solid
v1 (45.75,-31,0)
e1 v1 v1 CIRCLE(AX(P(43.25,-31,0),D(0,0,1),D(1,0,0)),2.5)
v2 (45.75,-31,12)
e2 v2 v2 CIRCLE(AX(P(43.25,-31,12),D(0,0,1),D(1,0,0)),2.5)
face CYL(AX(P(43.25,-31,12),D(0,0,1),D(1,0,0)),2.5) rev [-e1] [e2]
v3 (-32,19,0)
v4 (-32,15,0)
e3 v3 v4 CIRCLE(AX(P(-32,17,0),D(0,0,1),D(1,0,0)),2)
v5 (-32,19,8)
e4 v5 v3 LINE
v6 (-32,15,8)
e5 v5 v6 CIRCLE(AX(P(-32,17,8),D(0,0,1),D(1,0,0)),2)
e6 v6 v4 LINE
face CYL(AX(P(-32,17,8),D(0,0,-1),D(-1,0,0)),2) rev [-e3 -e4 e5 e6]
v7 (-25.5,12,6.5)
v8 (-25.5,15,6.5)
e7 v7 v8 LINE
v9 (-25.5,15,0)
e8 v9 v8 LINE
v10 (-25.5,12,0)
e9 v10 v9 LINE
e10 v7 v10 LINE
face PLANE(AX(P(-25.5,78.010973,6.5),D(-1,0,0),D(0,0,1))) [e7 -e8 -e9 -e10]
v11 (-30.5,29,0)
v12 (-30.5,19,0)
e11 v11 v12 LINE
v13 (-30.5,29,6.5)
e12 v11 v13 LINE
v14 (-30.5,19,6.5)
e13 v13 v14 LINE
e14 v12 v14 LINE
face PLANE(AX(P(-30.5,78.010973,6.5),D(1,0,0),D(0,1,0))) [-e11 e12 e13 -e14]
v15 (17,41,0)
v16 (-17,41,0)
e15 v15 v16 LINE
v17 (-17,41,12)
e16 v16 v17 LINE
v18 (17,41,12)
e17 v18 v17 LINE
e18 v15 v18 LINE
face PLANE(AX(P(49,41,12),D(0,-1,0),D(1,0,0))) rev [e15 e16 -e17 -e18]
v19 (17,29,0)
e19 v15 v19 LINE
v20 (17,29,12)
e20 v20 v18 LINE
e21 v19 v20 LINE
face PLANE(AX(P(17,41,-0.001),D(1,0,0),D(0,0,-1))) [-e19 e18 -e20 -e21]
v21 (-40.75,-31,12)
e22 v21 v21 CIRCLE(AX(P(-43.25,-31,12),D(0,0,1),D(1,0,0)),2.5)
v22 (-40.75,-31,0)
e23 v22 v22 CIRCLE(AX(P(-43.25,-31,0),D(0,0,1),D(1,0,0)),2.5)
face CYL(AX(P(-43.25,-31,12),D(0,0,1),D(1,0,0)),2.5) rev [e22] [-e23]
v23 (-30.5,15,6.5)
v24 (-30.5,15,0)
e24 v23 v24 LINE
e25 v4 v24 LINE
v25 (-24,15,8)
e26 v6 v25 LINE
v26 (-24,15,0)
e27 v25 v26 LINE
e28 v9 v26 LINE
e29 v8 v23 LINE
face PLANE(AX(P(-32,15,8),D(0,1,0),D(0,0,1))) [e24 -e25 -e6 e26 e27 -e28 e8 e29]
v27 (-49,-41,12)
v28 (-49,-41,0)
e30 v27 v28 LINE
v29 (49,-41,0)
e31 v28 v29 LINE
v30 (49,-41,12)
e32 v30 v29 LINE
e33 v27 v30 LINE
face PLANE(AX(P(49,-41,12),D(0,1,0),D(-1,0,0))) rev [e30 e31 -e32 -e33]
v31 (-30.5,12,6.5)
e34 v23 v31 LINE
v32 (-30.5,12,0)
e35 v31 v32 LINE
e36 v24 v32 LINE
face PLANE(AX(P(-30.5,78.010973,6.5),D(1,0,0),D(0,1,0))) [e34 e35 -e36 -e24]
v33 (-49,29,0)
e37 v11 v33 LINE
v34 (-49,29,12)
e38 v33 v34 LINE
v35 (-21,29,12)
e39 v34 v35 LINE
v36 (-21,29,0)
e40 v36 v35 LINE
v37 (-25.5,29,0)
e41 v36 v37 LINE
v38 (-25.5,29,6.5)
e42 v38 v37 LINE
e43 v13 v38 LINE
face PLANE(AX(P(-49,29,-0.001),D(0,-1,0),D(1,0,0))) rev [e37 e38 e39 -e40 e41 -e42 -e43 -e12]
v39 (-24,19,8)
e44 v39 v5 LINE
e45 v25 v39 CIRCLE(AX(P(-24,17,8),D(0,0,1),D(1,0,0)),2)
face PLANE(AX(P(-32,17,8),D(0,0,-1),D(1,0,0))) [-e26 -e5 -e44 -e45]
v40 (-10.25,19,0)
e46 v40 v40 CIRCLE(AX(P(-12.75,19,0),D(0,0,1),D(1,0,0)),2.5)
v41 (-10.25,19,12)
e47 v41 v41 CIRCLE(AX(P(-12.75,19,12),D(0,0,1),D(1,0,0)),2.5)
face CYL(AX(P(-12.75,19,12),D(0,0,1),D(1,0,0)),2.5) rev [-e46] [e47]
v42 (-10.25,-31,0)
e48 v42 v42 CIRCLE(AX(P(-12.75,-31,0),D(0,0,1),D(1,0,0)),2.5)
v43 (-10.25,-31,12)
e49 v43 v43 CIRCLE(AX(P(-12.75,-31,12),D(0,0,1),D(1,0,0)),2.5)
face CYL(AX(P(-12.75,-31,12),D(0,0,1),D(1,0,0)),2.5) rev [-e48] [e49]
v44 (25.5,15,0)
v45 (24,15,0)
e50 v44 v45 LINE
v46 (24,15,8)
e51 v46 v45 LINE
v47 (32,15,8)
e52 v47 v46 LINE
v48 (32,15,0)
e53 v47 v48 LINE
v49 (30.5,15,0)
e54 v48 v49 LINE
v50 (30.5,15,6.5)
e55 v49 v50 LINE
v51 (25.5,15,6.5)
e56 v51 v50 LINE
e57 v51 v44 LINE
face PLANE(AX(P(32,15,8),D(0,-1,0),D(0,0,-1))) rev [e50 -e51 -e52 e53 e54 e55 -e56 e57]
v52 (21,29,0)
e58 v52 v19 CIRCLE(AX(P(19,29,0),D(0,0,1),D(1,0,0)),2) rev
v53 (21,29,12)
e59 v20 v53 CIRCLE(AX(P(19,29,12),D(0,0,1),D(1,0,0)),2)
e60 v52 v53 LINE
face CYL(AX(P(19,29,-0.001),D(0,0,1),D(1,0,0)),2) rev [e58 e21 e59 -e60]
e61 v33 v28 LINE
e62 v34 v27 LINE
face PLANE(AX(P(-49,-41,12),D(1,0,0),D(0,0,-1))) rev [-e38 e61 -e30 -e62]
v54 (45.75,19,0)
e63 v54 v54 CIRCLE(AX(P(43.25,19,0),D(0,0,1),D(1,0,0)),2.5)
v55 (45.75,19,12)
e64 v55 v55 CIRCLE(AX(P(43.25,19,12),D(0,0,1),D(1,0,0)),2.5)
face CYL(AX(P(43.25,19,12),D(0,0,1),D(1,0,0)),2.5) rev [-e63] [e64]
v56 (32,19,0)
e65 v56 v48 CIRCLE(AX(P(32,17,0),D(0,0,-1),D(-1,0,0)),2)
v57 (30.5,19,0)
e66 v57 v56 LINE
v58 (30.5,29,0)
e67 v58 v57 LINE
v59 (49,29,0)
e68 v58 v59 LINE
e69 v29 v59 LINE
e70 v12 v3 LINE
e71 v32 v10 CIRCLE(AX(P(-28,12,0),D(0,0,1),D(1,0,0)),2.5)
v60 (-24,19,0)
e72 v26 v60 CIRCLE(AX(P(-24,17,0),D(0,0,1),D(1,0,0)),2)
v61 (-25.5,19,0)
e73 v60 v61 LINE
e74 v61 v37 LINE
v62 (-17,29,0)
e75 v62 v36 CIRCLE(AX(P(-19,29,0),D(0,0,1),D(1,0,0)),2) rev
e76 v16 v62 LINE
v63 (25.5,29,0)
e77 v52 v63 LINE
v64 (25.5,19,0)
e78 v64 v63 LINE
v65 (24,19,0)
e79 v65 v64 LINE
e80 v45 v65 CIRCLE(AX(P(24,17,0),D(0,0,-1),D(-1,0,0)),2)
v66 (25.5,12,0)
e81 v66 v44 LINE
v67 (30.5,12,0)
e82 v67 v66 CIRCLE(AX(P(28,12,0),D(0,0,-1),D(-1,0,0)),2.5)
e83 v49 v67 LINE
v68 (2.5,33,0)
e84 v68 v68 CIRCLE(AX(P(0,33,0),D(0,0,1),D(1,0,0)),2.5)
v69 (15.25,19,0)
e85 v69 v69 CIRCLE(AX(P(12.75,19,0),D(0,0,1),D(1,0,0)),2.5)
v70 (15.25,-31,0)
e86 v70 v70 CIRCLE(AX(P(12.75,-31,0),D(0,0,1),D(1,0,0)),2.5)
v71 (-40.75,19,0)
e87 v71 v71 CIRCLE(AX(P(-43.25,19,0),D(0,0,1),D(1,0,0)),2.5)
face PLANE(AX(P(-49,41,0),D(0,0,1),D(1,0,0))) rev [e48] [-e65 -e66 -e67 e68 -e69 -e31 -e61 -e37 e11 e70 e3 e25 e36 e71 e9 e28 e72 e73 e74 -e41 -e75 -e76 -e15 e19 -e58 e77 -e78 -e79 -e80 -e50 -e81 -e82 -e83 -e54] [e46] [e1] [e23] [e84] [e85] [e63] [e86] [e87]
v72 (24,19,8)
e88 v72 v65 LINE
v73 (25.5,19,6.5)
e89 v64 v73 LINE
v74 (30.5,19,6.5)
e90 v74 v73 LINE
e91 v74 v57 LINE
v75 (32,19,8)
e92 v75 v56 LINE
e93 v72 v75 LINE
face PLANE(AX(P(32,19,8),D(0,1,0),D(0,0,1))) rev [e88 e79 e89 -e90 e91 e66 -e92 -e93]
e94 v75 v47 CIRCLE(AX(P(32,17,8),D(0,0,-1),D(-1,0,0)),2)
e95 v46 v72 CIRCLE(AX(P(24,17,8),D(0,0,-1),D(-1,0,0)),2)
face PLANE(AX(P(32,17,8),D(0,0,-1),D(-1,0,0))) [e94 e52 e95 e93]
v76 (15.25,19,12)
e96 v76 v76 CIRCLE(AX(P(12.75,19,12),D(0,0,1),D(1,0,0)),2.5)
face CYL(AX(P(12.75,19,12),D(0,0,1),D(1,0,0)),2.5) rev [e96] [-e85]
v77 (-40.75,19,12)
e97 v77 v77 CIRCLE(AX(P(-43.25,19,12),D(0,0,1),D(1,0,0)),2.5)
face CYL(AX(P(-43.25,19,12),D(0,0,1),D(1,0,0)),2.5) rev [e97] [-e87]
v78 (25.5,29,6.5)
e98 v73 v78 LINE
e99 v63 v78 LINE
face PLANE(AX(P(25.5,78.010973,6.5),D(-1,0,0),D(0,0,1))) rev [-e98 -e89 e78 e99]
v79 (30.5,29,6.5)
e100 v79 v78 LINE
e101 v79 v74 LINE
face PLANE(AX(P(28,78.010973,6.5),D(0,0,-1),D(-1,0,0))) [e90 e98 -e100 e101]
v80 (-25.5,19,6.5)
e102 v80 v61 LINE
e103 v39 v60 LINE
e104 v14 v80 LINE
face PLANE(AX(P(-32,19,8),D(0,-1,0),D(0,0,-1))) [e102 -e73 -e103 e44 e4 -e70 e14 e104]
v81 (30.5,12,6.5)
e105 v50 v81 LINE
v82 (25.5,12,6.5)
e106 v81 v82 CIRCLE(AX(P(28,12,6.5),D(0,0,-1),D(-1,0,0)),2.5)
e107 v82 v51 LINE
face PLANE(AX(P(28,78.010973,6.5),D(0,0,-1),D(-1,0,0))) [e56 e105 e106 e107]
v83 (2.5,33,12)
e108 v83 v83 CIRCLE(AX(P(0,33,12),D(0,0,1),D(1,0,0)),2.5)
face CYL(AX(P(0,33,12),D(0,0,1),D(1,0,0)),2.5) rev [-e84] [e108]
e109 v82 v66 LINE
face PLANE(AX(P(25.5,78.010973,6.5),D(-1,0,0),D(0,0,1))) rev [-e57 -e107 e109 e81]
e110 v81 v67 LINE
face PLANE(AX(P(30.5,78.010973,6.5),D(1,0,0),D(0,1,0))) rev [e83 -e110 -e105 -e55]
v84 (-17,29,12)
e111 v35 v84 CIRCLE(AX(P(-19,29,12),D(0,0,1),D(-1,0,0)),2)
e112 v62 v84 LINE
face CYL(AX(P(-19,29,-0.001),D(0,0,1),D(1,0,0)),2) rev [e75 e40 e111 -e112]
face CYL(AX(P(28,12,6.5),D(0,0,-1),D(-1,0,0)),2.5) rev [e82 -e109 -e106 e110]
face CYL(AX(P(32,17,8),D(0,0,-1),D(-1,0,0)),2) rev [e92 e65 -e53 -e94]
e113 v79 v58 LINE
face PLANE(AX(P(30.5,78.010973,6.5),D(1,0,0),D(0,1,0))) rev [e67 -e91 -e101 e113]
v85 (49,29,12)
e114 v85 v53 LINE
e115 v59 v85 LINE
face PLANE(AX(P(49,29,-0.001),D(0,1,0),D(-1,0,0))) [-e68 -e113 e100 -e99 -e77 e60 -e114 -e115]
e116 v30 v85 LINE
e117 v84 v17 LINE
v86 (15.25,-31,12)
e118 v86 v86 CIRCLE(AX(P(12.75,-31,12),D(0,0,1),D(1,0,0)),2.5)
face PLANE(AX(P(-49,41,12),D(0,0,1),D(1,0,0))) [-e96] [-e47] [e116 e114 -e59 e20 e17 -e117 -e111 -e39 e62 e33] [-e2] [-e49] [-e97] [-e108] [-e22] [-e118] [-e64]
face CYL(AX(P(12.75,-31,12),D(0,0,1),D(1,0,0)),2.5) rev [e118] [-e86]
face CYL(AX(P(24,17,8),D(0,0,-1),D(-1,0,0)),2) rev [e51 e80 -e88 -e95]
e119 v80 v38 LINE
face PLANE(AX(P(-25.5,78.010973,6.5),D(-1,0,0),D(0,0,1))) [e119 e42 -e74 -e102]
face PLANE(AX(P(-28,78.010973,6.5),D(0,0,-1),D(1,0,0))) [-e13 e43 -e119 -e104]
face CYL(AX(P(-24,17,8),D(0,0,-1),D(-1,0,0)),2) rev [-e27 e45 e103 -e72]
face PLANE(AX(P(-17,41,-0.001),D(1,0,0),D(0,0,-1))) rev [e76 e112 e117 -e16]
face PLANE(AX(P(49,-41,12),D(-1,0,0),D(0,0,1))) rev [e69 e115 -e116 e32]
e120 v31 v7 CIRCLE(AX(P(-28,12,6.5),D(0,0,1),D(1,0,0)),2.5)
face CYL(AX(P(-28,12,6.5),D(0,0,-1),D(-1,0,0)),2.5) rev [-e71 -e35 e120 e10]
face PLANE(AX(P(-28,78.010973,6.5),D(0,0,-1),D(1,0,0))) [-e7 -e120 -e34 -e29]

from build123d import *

# Parameters (mm, degrees)
SKETCH1_W                = 98
SKETCH1_H                = 82
BOSS_EXTRUDE1_DEPTH      = 12
CUT_EXTRUDE1_REACH       = 67.008
SKETCH4_W                = 32
SKETCH4_H                = 12
F_5_0_5_DIAMETER_HOLE2_D = 5
F_5_0_5_DIAMETER_HOLE3_D = 5
CUT_EXTRUDE3_DEPTH       = 8
CUT_EXTRUDE4_DEPTH       = 6.5
F_5_0_5_DIAMETER_HOLE1_D = 5
CUT_EXTRUDE2_REACH       = 67.008


# Read off the part's stored shape, not the designer's step: Cut-Extrude3
with BuildPart() as part:
    # Sketch1 → Boss-Extrude1 (new body)
    with BuildSketch(Plane.XY):
        Rectangle(SKETCH1_W, SKETCH1_H)
    extrude(amount=BOSS_EXTRUDE1_DEPTH)

    # Sketch4 → Cut-Extrude1 (cut, up to next)
    with BuildSketch(Plane.XY.offset(12), mode=Mode.PRIVATE) as cut_extrude1_sk1:
        with Locations((-33, 35)):
            Rectangle(SKETCH4_W, SKETCH4_H)
    cut_extrude1_tool1 = extrude(cut_extrude1_sk1.sketch, amount=-CUT_EXTRUDE1_REACH, mode=Mode.PRIVATE) & part.part
    cut_extrude1 = cut_extrude1_tool1.solids().sort_by_distance((-33, 35, 12))[0]
    add(cut_extrude1, mode=Mode.SUBTRACT)

    # Mirror2: Cut-Extrude1 across plane
    add(cut_extrude1.mirror(Plane(origin=(0, 0, 0), x_dir=(0, 0, 1), z_dir=(1, 0, 0))), mode=Mode.SUBTRACT)

    # Ø5.0 (5) Diameter Hole2 (through all)
    with Locations(Plane.XY.offset(12)):
        with Locations((-12.75, 19), (-12.75, -31)):
            f_5_0_5_diameter_hole2 = Hole(F_5_0_5_DIAMETER_HOLE2_D / 2)

    # Ø5.0 (5) Diameter Hole3 (through all)
    with Locations(Plane.XY.offset(12)):
        with Locations((-43.25, 19), (-43.25, -31)):
            f_5_0_5_diameter_hole3 = Hole(F_5_0_5_DIAMETER_HOLE3_D / 2)

    # Cut-Extrude3 outline → Cut-Extrude3 (cut)
    with BuildSketch(Plane.XY):
        with BuildLine():
            ThreePointArc((32, 15), (34, 17), (32, 19))
            Line((32, 19), (24, 19))
            ThreePointArc((24, 19), (22, 17), (24, 15))
            Line((24, 15), (32, 15))
        make_face()
    cut_extrude3 = extrude(amount=CUT_EXTRUDE3_DEPTH, mode=Mode.SUBTRACT)

    # Sketch20 → Cut-Extrude4 (cut)
    with BuildSketch(Plane(origin=(39.292468455, 97.580435701, 0), x_dir=(-1, 0, 0), z_dir=(0, 0, -1))):
        with BuildLine():
            Line((13.792468455, -19.569462754), (13.792468455, -85.580435701))
            ThreePointArc((13.792468455, -85.580435701), (11.292468455, -88.080435701), (8.792468455, -85.580435701))
            Line((8.792468455, -85.580435701), (8.792468455, -19.569462754))
            ThreePointArc((8.792468455, -19.569462754), (11.292468455, -17.069462754), (13.792468455, -19.569462754))
        make_face()
    cut_extrude4 = extrude(amount=-CUT_EXTRUDE4_DEPTH, mode=Mode.SUBTRACT)

    # Mirror1: Ø5.0 (5) Diameter Hole2, Ø5.0 (5) Diameter Hole3, Cut-Extrude3, Cut-Extrude4 across plane
    add(f_5_0_5_diameter_hole2.mirror(Plane(origin=(0, 0, 0), x_dir=(0, 0, 1), z_dir=(1, 0, 0))), mode=Mode.SUBTRACT)
    add(f_5_0_5_diameter_hole3.mirror(Plane(origin=(0, 0, 0), x_dir=(0, 0, 1), z_dir=(1, 0, 0))), mode=Mode.SUBTRACT)
    add(cut_extrude3.mirror(Plane(origin=(0, 0, 0), x_dir=(0, 0, 1), z_dir=(1, 0, 0))), mode=Mode.SUBTRACT)
    add(cut_extrude4.mirror(Plane(origin=(0, 0, 0), x_dir=(0, 0, 1), z_dir=(1, 0, 0))), mode=Mode.SUBTRACT)

    # Ø5.0 (5) Diameter Hole1 (through all)
    with Locations(Plane.XY.offset(12)):
        with Locations((0, 33)):
            Hole(F_5_0_5_DIAMETER_HOLE1_D / 2)

    # Sketch16 → Cut-Extrude2 (cut, up to next)
    with BuildSketch(Plane.XY.offset(12), mode=Mode.PRIVATE) as cut_extrude2_sk1:
        with BuildLine():
            Line((-21, 29), (-17, 29))
            ThreePointArc((-17, 29), (-19, 27), (-21, 29))
        make_face()
    cut_extrude2_tool1 = extrude(cut_extrude2_sk1.sketch, amount=-CUT_EXTRUDE2_REACH, mode=Mode.PRIVATE) & part.part
    # Sketch16 → Cut-Extrude2 (cut, up to next)
    with BuildSketch(Plane.XY.offset(12), mode=Mode.PRIVATE) as cut_extrude2_sk2:
        with BuildLine():
            Line((17, 29), (21, 29))
            ThreePointArc((21, 29), (19, 27), (17, 29))
        make_face()
    cut_extrude2_tool2 = extrude(cut_extrude2_sk2.sketch, amount=-CUT_EXTRUDE2_REACH, mode=Mode.PRIVATE) & part.part
    add(cut_extrude2_tool1.solids().sort_by_distance((-19, 28.151174, 12))[0], mode=Mode.SUBTRACT)
    add(cut_extrude2_tool2.solids().sort_by_distance((19, 28.151174, 12))[0], mode=Mode.SUBTRACT)


solid = part.part
